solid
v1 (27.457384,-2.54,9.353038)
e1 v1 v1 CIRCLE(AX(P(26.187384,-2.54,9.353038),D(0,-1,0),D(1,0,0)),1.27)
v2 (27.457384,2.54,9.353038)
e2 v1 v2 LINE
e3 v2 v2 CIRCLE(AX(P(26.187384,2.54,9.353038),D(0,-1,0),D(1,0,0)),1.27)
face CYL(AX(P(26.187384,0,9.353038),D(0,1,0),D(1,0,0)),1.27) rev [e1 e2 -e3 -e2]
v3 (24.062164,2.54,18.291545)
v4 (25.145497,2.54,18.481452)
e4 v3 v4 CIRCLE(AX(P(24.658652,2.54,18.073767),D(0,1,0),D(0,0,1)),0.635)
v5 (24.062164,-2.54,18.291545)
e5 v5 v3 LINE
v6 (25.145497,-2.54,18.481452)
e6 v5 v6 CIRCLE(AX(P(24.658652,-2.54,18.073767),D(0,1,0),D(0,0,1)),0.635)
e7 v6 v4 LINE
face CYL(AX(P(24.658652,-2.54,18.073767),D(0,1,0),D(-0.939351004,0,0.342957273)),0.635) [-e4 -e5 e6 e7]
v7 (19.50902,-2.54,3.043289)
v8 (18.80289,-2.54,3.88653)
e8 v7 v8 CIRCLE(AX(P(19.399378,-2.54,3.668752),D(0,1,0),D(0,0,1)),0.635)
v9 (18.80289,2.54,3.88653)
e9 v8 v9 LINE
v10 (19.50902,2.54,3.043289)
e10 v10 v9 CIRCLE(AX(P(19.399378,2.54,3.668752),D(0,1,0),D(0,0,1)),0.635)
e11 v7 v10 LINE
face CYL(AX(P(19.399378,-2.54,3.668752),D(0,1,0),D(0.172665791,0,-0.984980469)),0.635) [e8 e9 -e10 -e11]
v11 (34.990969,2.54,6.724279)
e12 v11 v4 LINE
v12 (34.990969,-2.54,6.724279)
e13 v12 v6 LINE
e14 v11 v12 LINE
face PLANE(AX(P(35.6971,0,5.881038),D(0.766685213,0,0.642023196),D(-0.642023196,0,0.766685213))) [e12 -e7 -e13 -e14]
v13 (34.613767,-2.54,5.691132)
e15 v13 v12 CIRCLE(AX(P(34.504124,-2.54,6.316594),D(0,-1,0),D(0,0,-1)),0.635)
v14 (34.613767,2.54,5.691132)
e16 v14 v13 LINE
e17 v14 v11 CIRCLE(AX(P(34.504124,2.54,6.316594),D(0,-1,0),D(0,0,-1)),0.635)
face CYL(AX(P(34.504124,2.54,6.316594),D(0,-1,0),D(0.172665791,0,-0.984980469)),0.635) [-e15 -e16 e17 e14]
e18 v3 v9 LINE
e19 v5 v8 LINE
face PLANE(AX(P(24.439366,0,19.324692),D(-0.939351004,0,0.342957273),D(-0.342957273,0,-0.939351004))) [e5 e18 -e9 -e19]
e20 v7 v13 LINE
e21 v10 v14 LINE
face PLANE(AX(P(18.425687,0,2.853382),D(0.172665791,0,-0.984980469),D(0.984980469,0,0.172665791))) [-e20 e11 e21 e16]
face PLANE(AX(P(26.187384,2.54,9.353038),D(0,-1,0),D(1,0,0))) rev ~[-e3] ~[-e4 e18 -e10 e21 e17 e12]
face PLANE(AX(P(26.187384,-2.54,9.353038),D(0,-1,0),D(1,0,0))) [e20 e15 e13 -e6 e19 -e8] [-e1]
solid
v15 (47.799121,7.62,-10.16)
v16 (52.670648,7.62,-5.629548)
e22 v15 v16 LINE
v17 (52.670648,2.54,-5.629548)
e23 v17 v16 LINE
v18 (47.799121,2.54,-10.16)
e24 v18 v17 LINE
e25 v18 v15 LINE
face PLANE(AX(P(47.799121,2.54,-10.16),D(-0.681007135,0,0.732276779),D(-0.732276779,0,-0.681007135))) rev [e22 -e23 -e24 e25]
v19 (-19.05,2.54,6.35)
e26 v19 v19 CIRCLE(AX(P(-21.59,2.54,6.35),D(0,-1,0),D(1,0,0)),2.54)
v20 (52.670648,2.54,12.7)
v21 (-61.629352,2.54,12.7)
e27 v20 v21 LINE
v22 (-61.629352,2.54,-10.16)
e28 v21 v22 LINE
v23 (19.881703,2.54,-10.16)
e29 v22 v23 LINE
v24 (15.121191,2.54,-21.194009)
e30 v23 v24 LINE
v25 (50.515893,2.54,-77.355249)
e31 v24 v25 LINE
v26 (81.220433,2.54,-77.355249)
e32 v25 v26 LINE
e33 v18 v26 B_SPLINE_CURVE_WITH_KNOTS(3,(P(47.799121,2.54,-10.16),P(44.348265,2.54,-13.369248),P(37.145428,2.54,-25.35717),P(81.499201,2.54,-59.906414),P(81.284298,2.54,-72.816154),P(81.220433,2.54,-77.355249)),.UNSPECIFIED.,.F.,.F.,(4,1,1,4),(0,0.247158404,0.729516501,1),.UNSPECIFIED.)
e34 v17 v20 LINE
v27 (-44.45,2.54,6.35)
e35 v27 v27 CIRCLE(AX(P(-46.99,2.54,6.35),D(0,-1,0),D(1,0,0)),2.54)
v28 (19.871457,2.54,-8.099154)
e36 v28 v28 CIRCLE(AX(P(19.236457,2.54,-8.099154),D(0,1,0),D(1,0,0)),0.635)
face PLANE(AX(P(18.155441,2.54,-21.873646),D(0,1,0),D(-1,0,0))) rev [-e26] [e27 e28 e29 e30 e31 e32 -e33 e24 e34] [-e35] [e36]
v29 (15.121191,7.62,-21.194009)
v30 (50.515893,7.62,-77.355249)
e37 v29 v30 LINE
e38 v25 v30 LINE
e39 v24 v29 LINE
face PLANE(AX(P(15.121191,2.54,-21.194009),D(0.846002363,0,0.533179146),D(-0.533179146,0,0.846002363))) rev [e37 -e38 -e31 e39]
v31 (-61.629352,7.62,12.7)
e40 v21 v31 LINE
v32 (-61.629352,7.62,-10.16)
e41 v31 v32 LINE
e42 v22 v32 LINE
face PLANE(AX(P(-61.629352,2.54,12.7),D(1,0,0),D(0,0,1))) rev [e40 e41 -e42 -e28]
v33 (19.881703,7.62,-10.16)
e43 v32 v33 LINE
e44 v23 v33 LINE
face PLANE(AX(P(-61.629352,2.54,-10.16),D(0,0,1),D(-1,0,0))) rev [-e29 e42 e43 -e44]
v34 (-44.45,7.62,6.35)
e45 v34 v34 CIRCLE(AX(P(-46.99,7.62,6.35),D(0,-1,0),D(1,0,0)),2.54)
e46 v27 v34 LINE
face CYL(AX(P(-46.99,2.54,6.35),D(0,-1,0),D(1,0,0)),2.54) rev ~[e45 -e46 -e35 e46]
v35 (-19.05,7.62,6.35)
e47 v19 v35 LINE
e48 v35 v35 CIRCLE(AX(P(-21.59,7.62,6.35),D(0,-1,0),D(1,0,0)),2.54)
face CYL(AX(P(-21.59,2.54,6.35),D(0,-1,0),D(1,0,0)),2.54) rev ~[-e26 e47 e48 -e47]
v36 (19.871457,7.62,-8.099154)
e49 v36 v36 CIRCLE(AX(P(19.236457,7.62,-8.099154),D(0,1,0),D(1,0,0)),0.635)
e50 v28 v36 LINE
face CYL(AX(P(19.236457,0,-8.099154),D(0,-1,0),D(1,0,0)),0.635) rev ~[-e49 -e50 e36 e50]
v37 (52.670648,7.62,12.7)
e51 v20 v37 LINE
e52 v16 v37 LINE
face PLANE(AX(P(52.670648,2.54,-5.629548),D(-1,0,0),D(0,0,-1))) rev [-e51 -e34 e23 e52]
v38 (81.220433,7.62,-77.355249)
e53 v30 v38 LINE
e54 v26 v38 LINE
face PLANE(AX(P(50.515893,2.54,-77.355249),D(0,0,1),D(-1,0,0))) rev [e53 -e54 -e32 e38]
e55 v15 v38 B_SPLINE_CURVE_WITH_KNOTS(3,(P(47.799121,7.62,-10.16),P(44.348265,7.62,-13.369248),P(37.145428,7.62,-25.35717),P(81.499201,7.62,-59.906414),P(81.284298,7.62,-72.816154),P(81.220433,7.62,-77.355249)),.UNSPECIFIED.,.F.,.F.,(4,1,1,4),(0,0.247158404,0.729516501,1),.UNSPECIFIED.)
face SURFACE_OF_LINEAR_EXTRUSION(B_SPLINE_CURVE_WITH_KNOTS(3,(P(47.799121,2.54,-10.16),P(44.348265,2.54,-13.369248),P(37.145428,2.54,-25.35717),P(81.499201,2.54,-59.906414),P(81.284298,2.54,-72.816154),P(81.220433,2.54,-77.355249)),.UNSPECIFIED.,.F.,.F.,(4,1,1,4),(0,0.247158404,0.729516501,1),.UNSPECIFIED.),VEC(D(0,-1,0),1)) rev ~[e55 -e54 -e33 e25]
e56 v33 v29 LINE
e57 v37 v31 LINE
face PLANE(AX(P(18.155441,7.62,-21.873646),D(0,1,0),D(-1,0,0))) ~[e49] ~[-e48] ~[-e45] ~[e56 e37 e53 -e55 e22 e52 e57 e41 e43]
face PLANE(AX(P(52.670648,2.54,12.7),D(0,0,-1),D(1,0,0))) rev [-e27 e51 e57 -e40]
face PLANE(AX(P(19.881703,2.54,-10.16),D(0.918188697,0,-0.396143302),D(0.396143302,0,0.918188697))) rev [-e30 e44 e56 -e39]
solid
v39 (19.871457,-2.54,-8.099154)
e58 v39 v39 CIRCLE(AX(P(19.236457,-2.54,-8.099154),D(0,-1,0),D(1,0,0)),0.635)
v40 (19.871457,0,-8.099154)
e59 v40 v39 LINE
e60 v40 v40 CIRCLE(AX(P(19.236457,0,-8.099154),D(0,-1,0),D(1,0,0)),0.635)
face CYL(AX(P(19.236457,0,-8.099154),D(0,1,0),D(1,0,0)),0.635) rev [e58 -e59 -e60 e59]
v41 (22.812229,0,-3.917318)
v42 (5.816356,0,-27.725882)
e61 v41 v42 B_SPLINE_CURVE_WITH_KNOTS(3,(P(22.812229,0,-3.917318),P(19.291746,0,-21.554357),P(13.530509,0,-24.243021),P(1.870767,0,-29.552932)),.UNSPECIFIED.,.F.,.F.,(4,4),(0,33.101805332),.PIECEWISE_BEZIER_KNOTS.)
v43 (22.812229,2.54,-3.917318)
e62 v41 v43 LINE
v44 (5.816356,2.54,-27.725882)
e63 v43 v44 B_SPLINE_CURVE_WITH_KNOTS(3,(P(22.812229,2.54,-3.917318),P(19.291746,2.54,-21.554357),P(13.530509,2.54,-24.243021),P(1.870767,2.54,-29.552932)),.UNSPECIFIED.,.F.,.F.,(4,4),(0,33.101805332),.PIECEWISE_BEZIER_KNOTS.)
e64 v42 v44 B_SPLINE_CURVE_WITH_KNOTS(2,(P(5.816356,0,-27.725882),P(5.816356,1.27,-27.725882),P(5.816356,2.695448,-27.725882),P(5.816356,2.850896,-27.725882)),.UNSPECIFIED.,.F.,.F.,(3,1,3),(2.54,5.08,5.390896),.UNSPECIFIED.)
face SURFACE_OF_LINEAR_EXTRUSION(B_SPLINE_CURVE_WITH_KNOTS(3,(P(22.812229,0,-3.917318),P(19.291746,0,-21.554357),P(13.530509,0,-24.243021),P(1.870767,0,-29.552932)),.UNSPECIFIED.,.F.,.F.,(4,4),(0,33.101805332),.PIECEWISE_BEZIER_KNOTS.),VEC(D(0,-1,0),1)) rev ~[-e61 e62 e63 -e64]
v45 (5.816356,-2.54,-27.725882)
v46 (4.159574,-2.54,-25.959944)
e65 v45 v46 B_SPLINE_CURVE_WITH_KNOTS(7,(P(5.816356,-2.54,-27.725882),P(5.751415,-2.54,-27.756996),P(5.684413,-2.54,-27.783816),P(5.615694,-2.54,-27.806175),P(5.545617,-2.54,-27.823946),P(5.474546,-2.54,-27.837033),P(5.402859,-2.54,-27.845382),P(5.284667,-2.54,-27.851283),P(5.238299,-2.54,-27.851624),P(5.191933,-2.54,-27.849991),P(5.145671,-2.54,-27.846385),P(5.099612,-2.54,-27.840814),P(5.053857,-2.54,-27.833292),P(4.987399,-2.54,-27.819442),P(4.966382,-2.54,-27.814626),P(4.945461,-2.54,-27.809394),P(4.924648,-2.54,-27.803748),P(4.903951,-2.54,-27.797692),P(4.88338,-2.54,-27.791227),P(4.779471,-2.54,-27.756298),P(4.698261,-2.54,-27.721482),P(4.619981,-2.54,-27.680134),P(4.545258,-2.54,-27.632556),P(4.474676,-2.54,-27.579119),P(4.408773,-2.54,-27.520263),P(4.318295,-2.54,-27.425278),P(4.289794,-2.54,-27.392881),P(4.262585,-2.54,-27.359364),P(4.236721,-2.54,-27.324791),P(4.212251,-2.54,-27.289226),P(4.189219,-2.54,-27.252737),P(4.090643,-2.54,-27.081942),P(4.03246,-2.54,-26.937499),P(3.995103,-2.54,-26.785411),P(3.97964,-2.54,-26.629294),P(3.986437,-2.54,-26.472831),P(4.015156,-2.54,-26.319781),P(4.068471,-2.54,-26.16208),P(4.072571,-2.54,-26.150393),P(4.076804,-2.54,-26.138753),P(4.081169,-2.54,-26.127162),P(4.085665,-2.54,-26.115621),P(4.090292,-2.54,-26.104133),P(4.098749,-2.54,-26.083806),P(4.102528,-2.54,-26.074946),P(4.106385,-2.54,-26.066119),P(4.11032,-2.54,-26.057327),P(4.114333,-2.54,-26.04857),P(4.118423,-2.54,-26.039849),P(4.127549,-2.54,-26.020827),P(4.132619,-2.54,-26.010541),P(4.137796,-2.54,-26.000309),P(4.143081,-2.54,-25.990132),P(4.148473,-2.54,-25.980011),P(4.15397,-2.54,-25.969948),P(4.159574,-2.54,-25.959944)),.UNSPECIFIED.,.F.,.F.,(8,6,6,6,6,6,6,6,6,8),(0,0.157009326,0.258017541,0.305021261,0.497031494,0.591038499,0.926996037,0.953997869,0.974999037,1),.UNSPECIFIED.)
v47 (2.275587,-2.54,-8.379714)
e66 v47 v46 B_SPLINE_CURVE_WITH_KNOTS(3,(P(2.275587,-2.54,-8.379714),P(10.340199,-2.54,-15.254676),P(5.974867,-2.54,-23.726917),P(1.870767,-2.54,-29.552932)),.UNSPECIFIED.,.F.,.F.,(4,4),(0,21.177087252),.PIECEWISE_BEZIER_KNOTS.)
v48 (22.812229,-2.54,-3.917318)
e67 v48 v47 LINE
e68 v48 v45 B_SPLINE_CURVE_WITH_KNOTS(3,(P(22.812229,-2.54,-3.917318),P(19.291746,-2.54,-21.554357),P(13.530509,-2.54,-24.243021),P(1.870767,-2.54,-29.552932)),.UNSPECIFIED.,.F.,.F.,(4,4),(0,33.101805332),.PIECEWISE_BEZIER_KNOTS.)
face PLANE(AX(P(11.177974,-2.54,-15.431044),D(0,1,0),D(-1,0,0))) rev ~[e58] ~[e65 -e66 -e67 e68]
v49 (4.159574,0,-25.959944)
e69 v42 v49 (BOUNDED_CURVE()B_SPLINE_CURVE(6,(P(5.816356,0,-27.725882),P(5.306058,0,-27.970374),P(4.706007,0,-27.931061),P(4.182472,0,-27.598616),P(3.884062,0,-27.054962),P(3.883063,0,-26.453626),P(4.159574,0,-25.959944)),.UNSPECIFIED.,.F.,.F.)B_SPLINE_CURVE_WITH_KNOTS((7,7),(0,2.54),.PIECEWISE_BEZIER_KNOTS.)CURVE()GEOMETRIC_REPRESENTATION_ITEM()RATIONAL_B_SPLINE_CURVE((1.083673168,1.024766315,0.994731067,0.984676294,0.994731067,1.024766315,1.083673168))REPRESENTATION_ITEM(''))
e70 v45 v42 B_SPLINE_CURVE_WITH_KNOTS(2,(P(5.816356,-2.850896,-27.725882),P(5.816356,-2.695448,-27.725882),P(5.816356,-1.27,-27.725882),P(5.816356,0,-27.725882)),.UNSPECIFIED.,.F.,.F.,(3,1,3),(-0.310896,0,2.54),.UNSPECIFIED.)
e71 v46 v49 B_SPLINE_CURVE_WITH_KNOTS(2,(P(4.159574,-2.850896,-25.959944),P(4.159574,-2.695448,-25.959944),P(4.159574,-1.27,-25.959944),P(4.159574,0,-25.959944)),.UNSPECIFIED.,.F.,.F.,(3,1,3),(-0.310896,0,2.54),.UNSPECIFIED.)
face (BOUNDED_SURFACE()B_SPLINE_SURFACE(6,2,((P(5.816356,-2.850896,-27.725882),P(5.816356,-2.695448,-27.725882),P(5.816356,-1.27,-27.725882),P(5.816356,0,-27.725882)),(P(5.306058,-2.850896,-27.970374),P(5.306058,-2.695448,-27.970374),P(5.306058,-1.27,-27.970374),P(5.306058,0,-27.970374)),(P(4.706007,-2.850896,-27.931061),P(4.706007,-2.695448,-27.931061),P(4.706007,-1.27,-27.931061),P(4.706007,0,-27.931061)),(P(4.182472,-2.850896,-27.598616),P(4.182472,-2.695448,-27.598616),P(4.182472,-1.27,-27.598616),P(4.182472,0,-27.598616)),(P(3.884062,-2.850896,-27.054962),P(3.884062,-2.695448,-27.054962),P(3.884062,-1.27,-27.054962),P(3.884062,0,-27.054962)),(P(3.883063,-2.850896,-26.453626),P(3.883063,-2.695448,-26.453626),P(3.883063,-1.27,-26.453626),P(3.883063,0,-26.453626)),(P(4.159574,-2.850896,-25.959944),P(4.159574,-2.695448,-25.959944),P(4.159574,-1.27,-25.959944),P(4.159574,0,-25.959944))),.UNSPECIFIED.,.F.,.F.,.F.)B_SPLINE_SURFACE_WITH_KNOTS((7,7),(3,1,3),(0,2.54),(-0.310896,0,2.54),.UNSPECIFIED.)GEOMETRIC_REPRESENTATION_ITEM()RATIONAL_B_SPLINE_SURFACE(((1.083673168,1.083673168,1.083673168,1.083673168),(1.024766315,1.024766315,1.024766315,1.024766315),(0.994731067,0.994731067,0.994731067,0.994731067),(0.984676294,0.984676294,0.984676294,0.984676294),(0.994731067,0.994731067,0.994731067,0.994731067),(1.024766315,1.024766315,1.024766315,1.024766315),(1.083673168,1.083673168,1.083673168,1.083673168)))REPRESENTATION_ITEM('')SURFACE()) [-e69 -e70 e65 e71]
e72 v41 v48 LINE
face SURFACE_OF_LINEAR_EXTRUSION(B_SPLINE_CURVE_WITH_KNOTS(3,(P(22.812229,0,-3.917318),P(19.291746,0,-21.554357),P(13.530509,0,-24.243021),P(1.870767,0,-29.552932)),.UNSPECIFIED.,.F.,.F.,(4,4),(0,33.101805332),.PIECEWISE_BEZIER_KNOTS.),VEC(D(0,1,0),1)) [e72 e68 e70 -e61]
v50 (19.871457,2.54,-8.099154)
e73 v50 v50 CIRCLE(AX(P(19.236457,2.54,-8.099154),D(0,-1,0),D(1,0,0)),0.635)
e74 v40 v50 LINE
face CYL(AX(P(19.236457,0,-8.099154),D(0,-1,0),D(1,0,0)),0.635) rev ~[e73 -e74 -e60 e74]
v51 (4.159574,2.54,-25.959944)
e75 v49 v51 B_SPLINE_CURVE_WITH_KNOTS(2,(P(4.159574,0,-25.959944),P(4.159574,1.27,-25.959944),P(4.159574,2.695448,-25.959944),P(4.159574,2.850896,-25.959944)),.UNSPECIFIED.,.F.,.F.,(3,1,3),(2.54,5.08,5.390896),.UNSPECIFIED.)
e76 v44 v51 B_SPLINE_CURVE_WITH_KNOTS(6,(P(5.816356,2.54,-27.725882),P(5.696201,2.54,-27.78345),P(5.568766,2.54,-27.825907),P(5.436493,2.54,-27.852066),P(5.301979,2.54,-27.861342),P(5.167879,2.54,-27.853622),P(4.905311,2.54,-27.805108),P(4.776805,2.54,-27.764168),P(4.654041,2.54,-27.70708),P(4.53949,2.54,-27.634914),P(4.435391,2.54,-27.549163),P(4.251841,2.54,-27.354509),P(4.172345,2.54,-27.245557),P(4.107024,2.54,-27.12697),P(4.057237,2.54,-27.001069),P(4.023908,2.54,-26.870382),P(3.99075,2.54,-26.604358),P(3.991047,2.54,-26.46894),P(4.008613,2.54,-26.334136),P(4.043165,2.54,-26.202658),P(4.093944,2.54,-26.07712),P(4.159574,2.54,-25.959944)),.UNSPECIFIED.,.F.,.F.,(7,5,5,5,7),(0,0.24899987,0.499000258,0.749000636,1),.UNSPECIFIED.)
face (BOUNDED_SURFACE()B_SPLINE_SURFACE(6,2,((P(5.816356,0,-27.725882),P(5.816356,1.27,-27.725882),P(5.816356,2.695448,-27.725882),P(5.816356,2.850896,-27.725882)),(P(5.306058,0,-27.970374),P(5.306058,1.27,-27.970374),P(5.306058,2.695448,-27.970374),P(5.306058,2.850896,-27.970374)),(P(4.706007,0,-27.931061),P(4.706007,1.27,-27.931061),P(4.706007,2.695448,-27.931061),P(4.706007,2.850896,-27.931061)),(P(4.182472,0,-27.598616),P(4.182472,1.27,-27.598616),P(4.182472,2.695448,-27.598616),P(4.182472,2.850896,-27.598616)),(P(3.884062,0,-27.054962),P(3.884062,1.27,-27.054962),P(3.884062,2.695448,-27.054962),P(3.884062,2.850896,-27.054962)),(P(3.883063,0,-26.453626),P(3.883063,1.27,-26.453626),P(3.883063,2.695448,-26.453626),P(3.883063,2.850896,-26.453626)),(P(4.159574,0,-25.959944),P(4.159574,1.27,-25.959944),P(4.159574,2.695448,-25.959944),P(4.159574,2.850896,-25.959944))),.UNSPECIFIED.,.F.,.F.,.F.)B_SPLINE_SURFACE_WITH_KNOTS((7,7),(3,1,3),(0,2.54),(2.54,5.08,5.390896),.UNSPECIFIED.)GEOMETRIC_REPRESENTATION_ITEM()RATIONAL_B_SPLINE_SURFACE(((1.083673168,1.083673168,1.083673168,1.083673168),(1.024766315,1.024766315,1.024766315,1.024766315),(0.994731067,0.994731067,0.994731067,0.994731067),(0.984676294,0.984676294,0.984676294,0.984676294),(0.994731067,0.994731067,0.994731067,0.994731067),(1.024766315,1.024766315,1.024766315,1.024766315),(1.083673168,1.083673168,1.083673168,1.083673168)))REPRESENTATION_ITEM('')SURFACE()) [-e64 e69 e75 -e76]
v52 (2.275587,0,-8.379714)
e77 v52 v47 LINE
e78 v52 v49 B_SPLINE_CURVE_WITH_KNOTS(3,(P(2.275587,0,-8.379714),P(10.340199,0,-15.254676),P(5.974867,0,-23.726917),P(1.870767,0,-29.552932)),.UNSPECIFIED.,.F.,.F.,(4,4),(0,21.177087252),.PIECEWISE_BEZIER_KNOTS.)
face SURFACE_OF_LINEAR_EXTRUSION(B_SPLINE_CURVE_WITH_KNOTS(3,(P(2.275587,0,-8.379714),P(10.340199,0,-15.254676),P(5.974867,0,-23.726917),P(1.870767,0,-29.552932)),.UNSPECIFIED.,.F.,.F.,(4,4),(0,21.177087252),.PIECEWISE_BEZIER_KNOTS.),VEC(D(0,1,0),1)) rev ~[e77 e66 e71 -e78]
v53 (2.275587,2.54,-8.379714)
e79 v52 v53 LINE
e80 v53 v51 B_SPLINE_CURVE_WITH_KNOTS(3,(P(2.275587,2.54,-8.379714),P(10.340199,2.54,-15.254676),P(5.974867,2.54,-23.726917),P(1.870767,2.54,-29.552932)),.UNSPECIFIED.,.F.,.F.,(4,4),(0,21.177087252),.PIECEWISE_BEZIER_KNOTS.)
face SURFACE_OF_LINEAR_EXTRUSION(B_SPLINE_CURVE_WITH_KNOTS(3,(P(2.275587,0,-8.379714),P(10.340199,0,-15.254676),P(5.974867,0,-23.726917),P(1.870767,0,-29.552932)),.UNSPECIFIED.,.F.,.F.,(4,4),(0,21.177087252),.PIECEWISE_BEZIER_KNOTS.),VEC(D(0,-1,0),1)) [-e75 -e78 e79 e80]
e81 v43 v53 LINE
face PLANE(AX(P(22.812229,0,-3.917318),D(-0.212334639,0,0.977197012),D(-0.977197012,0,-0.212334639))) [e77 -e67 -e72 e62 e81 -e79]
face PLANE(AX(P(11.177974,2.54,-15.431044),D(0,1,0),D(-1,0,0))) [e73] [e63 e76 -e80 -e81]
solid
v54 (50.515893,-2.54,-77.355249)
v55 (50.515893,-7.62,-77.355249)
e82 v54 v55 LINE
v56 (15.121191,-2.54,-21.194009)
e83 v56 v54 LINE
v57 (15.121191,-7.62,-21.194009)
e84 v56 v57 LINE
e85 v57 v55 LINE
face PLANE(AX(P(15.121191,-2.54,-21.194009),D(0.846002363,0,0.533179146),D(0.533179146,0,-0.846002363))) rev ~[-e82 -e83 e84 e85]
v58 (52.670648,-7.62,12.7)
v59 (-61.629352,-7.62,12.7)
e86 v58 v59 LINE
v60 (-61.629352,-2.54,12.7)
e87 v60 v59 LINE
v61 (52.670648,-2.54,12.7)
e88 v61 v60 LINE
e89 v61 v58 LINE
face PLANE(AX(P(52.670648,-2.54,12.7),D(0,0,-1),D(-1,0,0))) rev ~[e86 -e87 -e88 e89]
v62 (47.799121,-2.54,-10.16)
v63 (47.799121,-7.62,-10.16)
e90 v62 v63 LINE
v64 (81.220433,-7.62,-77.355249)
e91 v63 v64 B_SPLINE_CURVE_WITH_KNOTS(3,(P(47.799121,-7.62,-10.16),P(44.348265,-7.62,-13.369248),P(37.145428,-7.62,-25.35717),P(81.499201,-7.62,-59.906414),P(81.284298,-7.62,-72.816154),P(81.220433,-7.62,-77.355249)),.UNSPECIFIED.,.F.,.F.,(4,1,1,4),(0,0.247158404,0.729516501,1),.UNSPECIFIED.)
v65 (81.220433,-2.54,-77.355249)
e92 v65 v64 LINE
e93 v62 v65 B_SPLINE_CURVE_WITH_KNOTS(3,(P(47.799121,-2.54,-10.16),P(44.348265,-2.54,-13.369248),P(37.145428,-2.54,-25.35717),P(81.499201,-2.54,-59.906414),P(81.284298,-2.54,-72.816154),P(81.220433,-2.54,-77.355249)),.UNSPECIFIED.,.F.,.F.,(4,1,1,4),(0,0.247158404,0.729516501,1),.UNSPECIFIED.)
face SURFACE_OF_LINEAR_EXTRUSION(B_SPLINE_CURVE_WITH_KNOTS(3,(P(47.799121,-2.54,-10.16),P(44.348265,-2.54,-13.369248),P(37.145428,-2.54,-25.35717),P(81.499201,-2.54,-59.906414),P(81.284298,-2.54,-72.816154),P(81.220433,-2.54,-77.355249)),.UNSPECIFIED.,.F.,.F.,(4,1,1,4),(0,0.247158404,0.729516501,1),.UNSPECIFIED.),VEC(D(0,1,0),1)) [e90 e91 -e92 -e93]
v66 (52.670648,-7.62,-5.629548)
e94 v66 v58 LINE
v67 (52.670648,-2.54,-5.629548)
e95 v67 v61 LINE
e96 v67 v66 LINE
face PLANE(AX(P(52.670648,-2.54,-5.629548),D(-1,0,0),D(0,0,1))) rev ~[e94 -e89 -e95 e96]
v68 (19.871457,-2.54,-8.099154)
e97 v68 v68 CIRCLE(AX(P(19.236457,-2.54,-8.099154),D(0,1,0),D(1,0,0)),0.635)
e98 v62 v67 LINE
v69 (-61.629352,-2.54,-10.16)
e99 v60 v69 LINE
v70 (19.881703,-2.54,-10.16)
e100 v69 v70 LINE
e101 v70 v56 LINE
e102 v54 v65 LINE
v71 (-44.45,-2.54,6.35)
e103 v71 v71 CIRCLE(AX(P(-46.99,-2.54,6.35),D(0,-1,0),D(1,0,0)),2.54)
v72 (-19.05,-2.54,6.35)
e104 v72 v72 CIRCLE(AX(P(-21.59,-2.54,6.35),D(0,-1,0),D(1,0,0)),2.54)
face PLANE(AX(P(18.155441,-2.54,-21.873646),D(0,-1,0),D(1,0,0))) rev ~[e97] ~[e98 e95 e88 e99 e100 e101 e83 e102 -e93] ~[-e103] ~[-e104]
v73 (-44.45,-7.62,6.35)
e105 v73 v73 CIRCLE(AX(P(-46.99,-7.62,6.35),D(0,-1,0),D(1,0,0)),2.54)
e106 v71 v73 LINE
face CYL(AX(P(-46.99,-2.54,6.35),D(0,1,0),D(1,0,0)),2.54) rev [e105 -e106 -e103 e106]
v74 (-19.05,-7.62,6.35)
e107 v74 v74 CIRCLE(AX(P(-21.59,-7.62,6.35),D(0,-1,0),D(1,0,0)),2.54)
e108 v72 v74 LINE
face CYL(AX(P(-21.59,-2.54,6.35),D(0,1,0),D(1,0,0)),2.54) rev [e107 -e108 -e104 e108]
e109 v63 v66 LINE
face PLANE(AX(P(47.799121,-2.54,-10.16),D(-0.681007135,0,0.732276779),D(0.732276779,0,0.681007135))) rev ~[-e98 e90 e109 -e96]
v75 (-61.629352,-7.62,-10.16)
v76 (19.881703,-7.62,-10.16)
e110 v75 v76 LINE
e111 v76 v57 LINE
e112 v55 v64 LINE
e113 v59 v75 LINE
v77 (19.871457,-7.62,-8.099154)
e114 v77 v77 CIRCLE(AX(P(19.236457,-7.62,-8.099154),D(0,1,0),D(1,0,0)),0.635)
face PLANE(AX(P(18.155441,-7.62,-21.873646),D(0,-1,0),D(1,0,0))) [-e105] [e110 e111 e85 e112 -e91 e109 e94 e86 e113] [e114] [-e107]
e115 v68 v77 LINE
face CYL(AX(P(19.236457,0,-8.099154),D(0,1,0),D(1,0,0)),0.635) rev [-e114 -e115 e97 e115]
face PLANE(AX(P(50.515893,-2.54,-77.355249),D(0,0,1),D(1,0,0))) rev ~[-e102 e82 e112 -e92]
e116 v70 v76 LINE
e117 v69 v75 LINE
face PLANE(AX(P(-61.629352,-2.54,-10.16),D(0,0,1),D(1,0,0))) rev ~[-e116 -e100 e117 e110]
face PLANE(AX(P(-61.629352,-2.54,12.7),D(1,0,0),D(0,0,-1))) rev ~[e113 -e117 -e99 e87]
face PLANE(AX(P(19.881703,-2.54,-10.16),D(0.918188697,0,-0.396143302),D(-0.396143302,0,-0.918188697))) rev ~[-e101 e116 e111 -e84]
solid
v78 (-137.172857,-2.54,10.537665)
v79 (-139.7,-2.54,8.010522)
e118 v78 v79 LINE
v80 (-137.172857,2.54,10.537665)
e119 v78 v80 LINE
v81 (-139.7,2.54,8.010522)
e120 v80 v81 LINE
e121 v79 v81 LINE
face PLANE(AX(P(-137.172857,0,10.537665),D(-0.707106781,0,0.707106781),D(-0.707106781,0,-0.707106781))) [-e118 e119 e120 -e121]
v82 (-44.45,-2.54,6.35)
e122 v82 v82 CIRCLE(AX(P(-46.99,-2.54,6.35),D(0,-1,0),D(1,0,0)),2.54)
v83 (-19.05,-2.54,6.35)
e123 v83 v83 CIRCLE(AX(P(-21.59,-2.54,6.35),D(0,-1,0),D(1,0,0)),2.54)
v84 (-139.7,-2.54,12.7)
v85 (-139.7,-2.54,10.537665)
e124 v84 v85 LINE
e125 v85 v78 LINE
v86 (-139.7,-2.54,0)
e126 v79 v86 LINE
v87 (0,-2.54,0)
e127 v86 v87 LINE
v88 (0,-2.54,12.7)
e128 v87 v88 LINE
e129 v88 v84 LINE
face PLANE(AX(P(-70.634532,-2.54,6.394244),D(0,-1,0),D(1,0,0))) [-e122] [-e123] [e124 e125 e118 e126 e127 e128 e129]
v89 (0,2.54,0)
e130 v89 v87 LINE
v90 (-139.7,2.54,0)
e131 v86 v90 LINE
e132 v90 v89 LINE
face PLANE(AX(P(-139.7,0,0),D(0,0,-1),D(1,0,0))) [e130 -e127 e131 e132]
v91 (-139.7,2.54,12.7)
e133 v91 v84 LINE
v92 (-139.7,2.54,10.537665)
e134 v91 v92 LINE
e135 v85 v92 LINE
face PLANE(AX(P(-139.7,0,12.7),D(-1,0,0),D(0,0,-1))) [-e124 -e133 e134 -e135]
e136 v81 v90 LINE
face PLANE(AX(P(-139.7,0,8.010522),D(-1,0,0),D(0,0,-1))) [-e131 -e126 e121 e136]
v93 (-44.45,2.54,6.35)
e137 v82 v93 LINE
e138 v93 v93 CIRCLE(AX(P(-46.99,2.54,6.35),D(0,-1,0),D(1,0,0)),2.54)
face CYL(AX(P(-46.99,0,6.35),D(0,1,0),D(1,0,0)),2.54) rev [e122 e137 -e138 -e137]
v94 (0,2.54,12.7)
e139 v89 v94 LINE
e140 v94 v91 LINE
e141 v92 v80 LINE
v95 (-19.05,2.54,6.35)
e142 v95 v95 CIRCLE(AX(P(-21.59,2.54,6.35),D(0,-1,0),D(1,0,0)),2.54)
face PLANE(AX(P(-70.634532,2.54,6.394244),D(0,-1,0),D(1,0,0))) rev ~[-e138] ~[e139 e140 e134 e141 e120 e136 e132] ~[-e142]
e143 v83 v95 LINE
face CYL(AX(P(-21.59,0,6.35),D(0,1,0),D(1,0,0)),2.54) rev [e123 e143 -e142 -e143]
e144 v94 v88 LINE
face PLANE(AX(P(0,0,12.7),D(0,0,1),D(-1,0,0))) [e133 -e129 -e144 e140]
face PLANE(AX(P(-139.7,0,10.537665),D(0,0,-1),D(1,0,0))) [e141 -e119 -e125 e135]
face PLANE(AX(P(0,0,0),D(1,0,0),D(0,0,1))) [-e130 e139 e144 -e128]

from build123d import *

# Parameters (mm, degrees)
F0_R      = 2.54
F1_DEPTH  = 2.54
F2_W      = 61.6293519594
F2_H      = 12.7
F2_R      = 2.54
F3_DEPTH  = 5.08
F4_R      = 0.635
F5_DEPTH  = 2.54
F6_DEPTH  = 7.6210001
F8_R      = 1.27
F9_R      = 1.27
F10_DEPTH = 2.54
F11_R     = 0.635


# Not quite as in the source:
# - the program builds the solid bodies; features that only make, move or delete a surface that nothing else refers to are left out


with BuildPart() as f1:
    # F0 (on Front) → F1 (new body, symmetric)
    with BuildSketch(Plane.XZ):
        Polygon((-139.7, 0), (0, 0), (0, 12.7), (-139.7, 12.7), (-139.7, 10.5376646731), (-137.1728569348, 10.5376646731), (-139.7, 8.0105216078), align=None)
        with Locations((-46.99, 6.35)):
            Circle(F0_R, mode=Mode.SUBTRACT)
        with Locations((-21.59, 6.35)):
            Circle(F0_R, mode=Mode.SUBTRACT)
    extrude(amount=F1_DEPTH, both=True)


with BuildPart() as f3:
    # F2 (on face) → F3 (new body)
    with BuildSketch(Plane.XZ.offset(2.54)):
        with BuildLine():
            Line((52.6706480406, 12.7), (0, 12.7))
            Line((0, 12.7), (0, 0))
            Line((0, 0), (-61.6293519594, 0))
            Line((-61.6293519594, 0), (-61.6293519594, -10.16))
            Line((-61.6293519594, -10.16), (19.8817028996, -10.16))
            Line((19.8817028996, -10.16), (15.1211905229, -21.1940087392))
            Line((15.1211905229, -21.1940087392), (50.5158929033, -77.355248563))
            Line((50.5158929033, -77.355248563), (81.2204327985, -77.355248563))
            add(Edge.make_bspline(
                [(47.799121146, -10.16), (44.3482648072, -13.3692479995), (37.1454276866, -25.357169668), (81.4992006887, -59.9064139099), (81.2842977033, -72.8161541739), (81.2204327985, -77.355248563)],
                knots=[0, 0, 0, 0, 0.2471584038, 0.7295165006, 1, 1, 1, 1], degree=3))
            Line((47.799121146, -10.16), (52.6706480406, -5.6295483074))
            Line((52.6706480406, -5.6295483074), (52.6706480406, 12.7))
        make_face()
        with Locations((-30.8146759797, 6.35)):
            Rectangle(F2_W, F2_H)
        with Locations((-46.99, 6.35)):
            Circle(F2_R, mode=Mode.SUBTRACT)
        with Locations((-21.59, 6.35)):
            Circle(F2_R, mode=Mode.SUBTRACT)
    extrude(amount=F3_DEPTH)

    # F4 (on Front) → F6 (cut, through all)
    with BuildSketch(Plane.XZ):
        with Locations((19.2364566028, -8.0991536379)):
            Circle(F4_R)
    extrude(amount=F6_DEPTH, mode=Mode.SUBTRACT)


with BuildPart() as f5:
    # F4 (on Front) → F5 (new body, symmetric)
    with BuildSketch(Plane.XZ):
        with BuildLine():
            add(Edge.make_bspline(
                [(22.8122286499, -3.9173178375), (19.2917461197, -21.5543570618), (13.5305089255, -24.243020763), (1.8707671043, -29.552931826)],
                knots=[0, 0, 0, 0, 33.1018053319, 33.1018053319, 33.1018053319, 33.1018053319], degree=3))
            Line((22.8122286499, -3.9173178375), (2.2755871012, -8.3797141855))
            add(Edge.make_bspline(
                [(2.2755871012, -8.3797141855), (10.3401988745, -15.254676342), (5.9748672721, -23.7269168006), (1.8707671043, -29.552931826)],
                knots=[0, 0, 0, 0, 21.1770872521, 21.1770872521, 21.1770872521, 21.1770872521], degree=3))
        make_face()
        with Locations((19.2364566028, -8.0991536379)):
            Circle(F4_R, mode=Mode.SUBTRACT)
    extrude(amount=F5_DEPTH, both=True)

    # F8
    f8_edges = [f5.edges().sort_by_distance(p)[0] for p in [
        (1.870767, 1.27, -29.552932),
        (1.870767, -1.27, -29.552932),
    ]]
    fillet(f8_edges, radius=F8_R)


with BuildPart() as f7_1:
    # F7: instance of F3
    add(f3.part.mirror(Plane.XZ))


with BuildPart() as f10:
    # F9 (on Front) → F10 (new body, symmetric)
    with BuildSketch(Plane.XZ):
        Polygon((18.4256873853, 2.853382407), (35.6970995837, 5.8810384254), (24.4393664586, 19.3246921392), align=None)
        with Locations((26.1873844759, 9.3530376572)):
            Circle(F9_R, mode=Mode.SUBTRACT)
    extrude(amount=F10_DEPTH, both=True)

    # F11
    f11_edges = [f10.edges().sort_by_distance(p)[0] for p in [
        (24.439366, 0, 19.324692),
        (35.6971, 0, 5.881038),
        (18.425687, 0, 2.853382),
    ]]
    fillet(f11_edges, radius=F11_R)


solid = Compound([f1.part, f3.part, f5.part, f7_1.part, f10.part])
